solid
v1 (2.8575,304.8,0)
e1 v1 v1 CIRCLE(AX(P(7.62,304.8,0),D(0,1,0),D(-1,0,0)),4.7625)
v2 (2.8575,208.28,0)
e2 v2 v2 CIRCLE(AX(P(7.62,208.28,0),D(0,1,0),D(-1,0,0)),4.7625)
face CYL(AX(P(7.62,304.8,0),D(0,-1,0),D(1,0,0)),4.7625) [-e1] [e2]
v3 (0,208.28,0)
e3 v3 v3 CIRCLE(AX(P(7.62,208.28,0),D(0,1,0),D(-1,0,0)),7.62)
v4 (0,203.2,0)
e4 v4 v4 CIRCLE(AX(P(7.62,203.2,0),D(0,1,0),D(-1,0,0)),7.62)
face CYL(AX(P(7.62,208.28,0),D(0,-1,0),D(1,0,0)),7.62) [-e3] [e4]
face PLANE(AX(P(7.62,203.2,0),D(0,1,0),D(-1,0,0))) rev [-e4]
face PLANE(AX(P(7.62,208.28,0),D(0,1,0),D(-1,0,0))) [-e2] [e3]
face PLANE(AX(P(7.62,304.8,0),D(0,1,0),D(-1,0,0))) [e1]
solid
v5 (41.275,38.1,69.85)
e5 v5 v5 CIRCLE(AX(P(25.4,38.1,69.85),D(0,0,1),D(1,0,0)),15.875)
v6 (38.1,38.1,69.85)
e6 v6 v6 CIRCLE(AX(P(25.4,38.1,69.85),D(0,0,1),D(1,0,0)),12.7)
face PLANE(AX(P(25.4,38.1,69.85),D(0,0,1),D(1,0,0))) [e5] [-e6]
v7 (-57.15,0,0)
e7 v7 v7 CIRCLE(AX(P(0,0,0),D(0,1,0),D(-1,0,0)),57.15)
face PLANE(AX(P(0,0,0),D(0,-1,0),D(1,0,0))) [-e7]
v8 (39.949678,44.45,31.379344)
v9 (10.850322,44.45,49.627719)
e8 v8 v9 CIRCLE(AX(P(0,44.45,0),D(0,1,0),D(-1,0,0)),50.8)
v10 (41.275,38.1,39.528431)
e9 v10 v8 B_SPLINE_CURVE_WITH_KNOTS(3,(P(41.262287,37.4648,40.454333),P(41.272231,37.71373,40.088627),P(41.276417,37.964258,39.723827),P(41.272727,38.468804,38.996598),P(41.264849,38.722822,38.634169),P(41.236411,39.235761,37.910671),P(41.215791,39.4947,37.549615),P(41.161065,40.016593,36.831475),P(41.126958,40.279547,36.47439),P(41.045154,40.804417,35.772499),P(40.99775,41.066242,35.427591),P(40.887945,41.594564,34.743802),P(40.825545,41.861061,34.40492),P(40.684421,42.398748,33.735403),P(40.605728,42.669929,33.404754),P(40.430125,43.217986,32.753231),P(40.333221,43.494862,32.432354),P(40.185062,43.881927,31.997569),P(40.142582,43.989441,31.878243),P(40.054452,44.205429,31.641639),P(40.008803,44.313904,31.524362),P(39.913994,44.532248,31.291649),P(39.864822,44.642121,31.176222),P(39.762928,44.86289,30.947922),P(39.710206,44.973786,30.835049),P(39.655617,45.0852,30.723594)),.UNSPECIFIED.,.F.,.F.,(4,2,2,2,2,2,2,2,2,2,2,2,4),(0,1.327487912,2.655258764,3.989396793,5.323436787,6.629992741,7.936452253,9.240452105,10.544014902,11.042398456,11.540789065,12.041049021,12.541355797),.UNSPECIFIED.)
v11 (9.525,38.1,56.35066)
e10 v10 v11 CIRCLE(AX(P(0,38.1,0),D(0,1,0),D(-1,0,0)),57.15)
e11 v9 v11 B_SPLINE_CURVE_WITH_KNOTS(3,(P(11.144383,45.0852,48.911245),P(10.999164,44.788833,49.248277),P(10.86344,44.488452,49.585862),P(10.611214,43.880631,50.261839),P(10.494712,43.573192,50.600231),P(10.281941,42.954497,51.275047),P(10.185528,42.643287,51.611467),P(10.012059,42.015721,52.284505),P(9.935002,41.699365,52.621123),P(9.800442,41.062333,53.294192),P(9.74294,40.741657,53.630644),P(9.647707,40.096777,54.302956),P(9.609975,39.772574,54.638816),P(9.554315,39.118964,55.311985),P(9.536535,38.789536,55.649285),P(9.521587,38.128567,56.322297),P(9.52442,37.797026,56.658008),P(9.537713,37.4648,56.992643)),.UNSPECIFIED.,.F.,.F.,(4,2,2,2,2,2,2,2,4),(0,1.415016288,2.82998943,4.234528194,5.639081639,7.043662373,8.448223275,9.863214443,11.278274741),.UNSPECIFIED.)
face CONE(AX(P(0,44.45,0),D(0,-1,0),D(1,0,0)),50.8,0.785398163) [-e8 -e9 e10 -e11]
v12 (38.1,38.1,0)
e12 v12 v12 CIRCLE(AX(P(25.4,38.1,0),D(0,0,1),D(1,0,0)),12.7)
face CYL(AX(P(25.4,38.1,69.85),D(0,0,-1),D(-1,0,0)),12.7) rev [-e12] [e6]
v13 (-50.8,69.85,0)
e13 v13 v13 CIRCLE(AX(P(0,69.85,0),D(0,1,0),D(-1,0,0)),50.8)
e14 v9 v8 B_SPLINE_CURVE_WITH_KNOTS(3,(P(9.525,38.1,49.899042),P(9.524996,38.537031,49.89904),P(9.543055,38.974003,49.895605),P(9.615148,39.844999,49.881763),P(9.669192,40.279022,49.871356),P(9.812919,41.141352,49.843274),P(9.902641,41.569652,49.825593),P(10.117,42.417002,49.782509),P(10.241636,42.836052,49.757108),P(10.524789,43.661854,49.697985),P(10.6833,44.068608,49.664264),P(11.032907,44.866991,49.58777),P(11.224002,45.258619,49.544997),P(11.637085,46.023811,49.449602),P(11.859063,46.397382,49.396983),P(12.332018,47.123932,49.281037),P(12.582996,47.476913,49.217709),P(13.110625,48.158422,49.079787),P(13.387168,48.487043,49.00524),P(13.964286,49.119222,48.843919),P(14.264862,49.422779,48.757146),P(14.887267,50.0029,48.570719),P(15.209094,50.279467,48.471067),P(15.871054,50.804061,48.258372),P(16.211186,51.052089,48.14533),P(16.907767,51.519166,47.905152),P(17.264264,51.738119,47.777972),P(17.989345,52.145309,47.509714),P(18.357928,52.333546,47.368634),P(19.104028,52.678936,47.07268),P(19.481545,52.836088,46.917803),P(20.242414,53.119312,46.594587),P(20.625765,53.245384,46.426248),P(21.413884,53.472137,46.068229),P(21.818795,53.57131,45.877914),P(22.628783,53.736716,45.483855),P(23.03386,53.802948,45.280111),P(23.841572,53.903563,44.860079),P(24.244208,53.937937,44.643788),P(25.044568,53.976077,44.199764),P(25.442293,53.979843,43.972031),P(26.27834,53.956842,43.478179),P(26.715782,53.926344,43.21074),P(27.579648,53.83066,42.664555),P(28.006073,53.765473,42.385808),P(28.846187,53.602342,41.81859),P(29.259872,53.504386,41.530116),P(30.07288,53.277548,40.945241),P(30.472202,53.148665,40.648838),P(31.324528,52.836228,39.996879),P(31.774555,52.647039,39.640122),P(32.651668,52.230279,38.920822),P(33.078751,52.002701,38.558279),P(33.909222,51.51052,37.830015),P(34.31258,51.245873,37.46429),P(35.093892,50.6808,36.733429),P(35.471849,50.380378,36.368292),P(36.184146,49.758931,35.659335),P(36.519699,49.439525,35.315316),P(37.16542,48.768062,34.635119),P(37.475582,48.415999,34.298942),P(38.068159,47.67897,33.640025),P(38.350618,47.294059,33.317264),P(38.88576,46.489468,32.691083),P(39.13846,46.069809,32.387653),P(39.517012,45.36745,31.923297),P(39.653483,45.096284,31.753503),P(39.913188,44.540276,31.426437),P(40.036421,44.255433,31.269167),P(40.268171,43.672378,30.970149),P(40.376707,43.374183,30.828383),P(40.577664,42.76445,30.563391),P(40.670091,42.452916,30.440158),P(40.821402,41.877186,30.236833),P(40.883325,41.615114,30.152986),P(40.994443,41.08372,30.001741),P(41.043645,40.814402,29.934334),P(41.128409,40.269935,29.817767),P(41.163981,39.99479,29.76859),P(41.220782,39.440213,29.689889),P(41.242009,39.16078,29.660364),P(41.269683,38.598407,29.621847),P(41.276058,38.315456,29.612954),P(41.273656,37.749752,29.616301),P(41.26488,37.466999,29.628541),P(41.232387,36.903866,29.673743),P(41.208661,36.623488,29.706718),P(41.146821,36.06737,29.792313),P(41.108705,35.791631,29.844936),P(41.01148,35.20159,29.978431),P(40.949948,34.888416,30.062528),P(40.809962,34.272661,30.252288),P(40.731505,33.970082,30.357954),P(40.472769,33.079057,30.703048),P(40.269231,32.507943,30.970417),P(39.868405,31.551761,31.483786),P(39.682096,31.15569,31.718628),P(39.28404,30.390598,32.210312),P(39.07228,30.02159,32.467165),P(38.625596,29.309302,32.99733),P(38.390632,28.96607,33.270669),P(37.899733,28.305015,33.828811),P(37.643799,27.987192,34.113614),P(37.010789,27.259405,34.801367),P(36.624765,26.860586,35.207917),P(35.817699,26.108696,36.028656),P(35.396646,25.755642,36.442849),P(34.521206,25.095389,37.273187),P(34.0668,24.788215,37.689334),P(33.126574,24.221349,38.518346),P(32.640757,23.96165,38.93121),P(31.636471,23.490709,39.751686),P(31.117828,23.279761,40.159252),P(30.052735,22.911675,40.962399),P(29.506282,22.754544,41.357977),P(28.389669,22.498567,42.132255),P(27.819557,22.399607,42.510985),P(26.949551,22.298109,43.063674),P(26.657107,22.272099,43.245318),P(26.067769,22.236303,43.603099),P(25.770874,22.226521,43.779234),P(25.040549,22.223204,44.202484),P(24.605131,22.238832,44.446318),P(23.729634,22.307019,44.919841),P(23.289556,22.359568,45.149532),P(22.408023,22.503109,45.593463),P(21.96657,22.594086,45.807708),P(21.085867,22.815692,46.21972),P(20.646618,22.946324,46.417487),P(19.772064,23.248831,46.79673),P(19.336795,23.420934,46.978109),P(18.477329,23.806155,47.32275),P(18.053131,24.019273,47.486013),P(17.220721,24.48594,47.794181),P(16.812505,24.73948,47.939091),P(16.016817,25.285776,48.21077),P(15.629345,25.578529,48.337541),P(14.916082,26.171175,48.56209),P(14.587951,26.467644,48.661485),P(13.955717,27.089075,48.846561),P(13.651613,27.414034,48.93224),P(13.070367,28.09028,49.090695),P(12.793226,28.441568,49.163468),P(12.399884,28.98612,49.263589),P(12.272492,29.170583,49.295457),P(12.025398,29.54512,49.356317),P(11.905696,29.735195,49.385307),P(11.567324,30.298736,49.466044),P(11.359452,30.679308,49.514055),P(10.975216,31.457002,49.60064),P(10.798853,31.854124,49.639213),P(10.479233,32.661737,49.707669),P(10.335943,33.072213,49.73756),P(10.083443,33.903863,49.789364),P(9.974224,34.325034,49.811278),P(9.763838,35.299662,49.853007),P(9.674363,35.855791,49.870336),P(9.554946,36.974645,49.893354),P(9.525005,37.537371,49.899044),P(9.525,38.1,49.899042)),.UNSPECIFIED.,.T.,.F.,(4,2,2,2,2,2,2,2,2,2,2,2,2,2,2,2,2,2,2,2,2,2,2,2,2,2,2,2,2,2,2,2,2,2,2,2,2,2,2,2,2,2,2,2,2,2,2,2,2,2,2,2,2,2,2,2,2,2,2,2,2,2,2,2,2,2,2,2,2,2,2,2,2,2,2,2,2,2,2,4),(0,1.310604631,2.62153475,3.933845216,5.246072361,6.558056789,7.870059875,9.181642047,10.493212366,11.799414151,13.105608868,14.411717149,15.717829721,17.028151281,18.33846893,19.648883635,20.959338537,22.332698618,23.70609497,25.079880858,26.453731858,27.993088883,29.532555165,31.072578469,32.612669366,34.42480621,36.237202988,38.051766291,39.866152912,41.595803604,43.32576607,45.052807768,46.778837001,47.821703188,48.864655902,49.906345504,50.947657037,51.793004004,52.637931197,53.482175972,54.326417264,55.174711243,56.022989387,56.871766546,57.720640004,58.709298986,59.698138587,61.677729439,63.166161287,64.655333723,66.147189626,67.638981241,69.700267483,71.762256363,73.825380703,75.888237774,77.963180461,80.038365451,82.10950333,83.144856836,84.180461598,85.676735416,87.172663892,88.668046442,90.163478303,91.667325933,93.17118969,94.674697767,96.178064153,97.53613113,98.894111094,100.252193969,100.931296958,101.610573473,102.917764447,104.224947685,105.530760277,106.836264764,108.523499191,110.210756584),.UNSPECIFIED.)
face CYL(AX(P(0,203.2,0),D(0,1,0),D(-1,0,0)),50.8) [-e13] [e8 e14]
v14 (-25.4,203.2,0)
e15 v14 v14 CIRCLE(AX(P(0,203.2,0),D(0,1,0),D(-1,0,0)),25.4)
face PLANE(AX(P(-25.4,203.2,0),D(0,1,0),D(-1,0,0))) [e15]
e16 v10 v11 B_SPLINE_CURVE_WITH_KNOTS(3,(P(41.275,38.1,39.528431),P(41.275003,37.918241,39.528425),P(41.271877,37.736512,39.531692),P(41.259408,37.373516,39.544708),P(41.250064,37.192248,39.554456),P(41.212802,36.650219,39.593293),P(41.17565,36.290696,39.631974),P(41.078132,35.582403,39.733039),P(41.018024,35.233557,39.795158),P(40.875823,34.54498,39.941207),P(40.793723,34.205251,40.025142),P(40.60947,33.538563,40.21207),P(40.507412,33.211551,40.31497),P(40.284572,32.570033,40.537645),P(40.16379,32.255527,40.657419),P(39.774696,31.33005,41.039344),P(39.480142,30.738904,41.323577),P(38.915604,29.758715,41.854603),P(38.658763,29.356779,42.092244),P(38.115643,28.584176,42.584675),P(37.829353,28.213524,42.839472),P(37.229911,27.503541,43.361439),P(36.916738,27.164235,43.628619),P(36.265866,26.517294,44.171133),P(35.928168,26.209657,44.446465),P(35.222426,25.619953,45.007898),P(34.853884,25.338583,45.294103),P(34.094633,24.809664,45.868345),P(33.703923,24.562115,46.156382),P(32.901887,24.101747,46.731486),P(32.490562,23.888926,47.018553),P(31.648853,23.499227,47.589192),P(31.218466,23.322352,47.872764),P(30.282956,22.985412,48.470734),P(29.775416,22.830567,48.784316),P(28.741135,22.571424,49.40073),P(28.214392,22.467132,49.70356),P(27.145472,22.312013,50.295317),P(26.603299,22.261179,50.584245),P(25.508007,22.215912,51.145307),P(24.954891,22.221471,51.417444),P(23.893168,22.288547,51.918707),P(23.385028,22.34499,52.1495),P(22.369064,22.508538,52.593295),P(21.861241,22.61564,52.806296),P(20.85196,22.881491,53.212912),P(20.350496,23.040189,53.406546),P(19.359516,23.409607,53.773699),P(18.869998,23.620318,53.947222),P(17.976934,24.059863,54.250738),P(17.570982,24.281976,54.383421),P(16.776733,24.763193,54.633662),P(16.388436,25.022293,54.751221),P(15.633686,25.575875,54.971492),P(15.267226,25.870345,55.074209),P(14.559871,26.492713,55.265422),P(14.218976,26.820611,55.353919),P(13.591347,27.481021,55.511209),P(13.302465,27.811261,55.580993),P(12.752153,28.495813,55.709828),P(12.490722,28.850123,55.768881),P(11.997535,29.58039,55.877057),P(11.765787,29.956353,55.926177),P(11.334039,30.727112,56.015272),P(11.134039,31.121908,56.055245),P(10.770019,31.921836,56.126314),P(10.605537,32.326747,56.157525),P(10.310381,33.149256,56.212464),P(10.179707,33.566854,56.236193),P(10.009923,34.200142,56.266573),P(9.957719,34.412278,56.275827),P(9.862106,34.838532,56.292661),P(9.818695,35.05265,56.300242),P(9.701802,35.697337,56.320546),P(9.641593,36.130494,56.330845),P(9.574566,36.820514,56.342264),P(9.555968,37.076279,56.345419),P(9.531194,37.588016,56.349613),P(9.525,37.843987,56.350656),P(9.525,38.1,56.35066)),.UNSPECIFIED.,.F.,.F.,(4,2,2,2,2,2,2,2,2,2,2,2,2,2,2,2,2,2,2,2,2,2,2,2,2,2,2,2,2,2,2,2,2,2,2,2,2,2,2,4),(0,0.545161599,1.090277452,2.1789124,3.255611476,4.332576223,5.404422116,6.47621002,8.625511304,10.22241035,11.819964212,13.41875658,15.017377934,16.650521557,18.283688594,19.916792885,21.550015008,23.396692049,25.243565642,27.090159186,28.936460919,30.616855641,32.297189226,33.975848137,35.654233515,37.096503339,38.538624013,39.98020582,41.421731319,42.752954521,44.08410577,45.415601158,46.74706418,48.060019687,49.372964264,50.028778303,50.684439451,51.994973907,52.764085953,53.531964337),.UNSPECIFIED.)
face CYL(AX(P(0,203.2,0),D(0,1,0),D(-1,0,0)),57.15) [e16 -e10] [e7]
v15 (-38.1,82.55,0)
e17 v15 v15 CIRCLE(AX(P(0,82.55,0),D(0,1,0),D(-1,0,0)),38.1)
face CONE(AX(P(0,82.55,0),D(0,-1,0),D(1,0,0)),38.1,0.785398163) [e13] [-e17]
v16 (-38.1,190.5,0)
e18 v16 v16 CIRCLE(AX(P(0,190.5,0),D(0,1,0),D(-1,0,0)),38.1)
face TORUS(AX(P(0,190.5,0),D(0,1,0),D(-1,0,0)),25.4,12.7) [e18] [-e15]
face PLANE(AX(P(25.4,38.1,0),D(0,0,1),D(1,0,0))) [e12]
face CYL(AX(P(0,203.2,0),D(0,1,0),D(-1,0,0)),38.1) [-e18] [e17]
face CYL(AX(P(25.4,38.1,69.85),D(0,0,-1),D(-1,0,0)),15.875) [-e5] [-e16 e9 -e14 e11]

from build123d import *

# Parameters (mm, degrees)
CHAMFER1_SIZE       = 6.35
CHAMFER2_SIZE       = 12.7
SKETCH2_R           = 4.7625
BOSS_EXTRUDE1_DEPTH = 101.6
SKETCH3_R           = 15.875
SKETCH3_R_2         = 12.7
BOSS_EXTRUDE2_DEPTH = 69.85
CUT_EXTRUDE1_START  = -69.85
SKETCH4_R           = 12.7
CUT_EXTRUDE1_DEPTH  = 69.85
SKETCH5_R           = 7.62
BOSS_EXTRUDE3_DEPTH = 5.08


with BuildPart() as part:
    # Sketch1 → Revolve1 (revolve)
    with BuildSketch(Plane.XY):
        with BuildLine():
            Line((0, 0), (-57.15, 0))
            Line((-57.15, 0), (-57.15, 38.1))
            Line((-57.15, 38.1), (-50.8, 38.1))
            Line((-50.8, 38.1), (-50.8, 69.85))
            Line((-50.8, 69.85), (-38.1, 69.85))
            Line((-38.1, 69.85), (-38.1, 190.5))
            ThreePointArc((-38.1, 190.5), (-34.380256121, 199.480256121), (-25.4, 203.2))
            Line((-25.4, 203.2), (0, 203.2))
            Line((0, 203.2), (0, 0))
        make_face()
    revolve(axis=Axis((0, 203.2, 0), (0, -1, 0)))

    # Chamfer1
    chamfer1_edges = [part.edges().sort_by_distance(p)[0] for p in [
        (50.8, 38.1, 0),
    ]]
    chamfer(chamfer1_edges, length=CHAMFER1_SIZE - 0.0001)  # a hair under: the kernel refuses the full size

    # Chamfer2
    chamfer2_edges = [part.edges().sort_by_distance(p)[0] for p in [
        (38.1, 69.85, 0),
    ]]
    chamfer(chamfer2_edges, length=CHAMFER2_SIZE - 0.0001)  # a hair under: the kernel refuses the full size

    # Sketch3 → Boss-Extrude2 (add)
    with BuildSketch(Plane.XY):
        with Locations(Location((25.4, 38.1, 0), (0, 0, 180.00000949))):
            Circle(SKETCH3_R)
        with Locations(Location((25.4, 38.1, 0), (0, 0, 180.000009381))):
            Circle(SKETCH3_R_2, mode=Mode.SUBTRACT)
    extrude(amount=BOSS_EXTRUDE2_DEPTH)

    # Sketch4 → Cut-Extrude1 (cut)
    with BuildSketch(Plane.XY.offset(69.85).offset(CUT_EXTRUDE1_START)):
        with Locations((25.4, 38.1)):
            Circle(SKETCH4_R)
    extrude(amount=CUT_EXTRUDE1_DEPTH, mode=Mode.SUBTRACT)


with BuildPart() as body_2:
    # Sketch2 → Boss-Extrude1 (new body)
    with BuildSketch(Plane(origin=(0, 203.2, 0), x_dir=(1, 0, 0), z_dir=(0, 1, 0))):
        with Locations(Location((7.62, 0, 0), (0, 0, 180))):
            Circle(SKETCH2_R)
    extrude(amount=BOSS_EXTRUDE1_DEPTH)

    # Sketch5 → Boss-Extrude3 (add)
    with BuildSketch(Plane(origin=(0, 203.2, 0), x_dir=(1, 0, 0), z_dir=(0, 1, 0))):
        with Locations(Location((7.62, 0, 0), (0, 0, 180))):
            Circle(SKETCH5_R)
    extrude(amount=BOSS_EXTRUDE3_DEPTH)


solid = Compound([part.part, body_2.part])
